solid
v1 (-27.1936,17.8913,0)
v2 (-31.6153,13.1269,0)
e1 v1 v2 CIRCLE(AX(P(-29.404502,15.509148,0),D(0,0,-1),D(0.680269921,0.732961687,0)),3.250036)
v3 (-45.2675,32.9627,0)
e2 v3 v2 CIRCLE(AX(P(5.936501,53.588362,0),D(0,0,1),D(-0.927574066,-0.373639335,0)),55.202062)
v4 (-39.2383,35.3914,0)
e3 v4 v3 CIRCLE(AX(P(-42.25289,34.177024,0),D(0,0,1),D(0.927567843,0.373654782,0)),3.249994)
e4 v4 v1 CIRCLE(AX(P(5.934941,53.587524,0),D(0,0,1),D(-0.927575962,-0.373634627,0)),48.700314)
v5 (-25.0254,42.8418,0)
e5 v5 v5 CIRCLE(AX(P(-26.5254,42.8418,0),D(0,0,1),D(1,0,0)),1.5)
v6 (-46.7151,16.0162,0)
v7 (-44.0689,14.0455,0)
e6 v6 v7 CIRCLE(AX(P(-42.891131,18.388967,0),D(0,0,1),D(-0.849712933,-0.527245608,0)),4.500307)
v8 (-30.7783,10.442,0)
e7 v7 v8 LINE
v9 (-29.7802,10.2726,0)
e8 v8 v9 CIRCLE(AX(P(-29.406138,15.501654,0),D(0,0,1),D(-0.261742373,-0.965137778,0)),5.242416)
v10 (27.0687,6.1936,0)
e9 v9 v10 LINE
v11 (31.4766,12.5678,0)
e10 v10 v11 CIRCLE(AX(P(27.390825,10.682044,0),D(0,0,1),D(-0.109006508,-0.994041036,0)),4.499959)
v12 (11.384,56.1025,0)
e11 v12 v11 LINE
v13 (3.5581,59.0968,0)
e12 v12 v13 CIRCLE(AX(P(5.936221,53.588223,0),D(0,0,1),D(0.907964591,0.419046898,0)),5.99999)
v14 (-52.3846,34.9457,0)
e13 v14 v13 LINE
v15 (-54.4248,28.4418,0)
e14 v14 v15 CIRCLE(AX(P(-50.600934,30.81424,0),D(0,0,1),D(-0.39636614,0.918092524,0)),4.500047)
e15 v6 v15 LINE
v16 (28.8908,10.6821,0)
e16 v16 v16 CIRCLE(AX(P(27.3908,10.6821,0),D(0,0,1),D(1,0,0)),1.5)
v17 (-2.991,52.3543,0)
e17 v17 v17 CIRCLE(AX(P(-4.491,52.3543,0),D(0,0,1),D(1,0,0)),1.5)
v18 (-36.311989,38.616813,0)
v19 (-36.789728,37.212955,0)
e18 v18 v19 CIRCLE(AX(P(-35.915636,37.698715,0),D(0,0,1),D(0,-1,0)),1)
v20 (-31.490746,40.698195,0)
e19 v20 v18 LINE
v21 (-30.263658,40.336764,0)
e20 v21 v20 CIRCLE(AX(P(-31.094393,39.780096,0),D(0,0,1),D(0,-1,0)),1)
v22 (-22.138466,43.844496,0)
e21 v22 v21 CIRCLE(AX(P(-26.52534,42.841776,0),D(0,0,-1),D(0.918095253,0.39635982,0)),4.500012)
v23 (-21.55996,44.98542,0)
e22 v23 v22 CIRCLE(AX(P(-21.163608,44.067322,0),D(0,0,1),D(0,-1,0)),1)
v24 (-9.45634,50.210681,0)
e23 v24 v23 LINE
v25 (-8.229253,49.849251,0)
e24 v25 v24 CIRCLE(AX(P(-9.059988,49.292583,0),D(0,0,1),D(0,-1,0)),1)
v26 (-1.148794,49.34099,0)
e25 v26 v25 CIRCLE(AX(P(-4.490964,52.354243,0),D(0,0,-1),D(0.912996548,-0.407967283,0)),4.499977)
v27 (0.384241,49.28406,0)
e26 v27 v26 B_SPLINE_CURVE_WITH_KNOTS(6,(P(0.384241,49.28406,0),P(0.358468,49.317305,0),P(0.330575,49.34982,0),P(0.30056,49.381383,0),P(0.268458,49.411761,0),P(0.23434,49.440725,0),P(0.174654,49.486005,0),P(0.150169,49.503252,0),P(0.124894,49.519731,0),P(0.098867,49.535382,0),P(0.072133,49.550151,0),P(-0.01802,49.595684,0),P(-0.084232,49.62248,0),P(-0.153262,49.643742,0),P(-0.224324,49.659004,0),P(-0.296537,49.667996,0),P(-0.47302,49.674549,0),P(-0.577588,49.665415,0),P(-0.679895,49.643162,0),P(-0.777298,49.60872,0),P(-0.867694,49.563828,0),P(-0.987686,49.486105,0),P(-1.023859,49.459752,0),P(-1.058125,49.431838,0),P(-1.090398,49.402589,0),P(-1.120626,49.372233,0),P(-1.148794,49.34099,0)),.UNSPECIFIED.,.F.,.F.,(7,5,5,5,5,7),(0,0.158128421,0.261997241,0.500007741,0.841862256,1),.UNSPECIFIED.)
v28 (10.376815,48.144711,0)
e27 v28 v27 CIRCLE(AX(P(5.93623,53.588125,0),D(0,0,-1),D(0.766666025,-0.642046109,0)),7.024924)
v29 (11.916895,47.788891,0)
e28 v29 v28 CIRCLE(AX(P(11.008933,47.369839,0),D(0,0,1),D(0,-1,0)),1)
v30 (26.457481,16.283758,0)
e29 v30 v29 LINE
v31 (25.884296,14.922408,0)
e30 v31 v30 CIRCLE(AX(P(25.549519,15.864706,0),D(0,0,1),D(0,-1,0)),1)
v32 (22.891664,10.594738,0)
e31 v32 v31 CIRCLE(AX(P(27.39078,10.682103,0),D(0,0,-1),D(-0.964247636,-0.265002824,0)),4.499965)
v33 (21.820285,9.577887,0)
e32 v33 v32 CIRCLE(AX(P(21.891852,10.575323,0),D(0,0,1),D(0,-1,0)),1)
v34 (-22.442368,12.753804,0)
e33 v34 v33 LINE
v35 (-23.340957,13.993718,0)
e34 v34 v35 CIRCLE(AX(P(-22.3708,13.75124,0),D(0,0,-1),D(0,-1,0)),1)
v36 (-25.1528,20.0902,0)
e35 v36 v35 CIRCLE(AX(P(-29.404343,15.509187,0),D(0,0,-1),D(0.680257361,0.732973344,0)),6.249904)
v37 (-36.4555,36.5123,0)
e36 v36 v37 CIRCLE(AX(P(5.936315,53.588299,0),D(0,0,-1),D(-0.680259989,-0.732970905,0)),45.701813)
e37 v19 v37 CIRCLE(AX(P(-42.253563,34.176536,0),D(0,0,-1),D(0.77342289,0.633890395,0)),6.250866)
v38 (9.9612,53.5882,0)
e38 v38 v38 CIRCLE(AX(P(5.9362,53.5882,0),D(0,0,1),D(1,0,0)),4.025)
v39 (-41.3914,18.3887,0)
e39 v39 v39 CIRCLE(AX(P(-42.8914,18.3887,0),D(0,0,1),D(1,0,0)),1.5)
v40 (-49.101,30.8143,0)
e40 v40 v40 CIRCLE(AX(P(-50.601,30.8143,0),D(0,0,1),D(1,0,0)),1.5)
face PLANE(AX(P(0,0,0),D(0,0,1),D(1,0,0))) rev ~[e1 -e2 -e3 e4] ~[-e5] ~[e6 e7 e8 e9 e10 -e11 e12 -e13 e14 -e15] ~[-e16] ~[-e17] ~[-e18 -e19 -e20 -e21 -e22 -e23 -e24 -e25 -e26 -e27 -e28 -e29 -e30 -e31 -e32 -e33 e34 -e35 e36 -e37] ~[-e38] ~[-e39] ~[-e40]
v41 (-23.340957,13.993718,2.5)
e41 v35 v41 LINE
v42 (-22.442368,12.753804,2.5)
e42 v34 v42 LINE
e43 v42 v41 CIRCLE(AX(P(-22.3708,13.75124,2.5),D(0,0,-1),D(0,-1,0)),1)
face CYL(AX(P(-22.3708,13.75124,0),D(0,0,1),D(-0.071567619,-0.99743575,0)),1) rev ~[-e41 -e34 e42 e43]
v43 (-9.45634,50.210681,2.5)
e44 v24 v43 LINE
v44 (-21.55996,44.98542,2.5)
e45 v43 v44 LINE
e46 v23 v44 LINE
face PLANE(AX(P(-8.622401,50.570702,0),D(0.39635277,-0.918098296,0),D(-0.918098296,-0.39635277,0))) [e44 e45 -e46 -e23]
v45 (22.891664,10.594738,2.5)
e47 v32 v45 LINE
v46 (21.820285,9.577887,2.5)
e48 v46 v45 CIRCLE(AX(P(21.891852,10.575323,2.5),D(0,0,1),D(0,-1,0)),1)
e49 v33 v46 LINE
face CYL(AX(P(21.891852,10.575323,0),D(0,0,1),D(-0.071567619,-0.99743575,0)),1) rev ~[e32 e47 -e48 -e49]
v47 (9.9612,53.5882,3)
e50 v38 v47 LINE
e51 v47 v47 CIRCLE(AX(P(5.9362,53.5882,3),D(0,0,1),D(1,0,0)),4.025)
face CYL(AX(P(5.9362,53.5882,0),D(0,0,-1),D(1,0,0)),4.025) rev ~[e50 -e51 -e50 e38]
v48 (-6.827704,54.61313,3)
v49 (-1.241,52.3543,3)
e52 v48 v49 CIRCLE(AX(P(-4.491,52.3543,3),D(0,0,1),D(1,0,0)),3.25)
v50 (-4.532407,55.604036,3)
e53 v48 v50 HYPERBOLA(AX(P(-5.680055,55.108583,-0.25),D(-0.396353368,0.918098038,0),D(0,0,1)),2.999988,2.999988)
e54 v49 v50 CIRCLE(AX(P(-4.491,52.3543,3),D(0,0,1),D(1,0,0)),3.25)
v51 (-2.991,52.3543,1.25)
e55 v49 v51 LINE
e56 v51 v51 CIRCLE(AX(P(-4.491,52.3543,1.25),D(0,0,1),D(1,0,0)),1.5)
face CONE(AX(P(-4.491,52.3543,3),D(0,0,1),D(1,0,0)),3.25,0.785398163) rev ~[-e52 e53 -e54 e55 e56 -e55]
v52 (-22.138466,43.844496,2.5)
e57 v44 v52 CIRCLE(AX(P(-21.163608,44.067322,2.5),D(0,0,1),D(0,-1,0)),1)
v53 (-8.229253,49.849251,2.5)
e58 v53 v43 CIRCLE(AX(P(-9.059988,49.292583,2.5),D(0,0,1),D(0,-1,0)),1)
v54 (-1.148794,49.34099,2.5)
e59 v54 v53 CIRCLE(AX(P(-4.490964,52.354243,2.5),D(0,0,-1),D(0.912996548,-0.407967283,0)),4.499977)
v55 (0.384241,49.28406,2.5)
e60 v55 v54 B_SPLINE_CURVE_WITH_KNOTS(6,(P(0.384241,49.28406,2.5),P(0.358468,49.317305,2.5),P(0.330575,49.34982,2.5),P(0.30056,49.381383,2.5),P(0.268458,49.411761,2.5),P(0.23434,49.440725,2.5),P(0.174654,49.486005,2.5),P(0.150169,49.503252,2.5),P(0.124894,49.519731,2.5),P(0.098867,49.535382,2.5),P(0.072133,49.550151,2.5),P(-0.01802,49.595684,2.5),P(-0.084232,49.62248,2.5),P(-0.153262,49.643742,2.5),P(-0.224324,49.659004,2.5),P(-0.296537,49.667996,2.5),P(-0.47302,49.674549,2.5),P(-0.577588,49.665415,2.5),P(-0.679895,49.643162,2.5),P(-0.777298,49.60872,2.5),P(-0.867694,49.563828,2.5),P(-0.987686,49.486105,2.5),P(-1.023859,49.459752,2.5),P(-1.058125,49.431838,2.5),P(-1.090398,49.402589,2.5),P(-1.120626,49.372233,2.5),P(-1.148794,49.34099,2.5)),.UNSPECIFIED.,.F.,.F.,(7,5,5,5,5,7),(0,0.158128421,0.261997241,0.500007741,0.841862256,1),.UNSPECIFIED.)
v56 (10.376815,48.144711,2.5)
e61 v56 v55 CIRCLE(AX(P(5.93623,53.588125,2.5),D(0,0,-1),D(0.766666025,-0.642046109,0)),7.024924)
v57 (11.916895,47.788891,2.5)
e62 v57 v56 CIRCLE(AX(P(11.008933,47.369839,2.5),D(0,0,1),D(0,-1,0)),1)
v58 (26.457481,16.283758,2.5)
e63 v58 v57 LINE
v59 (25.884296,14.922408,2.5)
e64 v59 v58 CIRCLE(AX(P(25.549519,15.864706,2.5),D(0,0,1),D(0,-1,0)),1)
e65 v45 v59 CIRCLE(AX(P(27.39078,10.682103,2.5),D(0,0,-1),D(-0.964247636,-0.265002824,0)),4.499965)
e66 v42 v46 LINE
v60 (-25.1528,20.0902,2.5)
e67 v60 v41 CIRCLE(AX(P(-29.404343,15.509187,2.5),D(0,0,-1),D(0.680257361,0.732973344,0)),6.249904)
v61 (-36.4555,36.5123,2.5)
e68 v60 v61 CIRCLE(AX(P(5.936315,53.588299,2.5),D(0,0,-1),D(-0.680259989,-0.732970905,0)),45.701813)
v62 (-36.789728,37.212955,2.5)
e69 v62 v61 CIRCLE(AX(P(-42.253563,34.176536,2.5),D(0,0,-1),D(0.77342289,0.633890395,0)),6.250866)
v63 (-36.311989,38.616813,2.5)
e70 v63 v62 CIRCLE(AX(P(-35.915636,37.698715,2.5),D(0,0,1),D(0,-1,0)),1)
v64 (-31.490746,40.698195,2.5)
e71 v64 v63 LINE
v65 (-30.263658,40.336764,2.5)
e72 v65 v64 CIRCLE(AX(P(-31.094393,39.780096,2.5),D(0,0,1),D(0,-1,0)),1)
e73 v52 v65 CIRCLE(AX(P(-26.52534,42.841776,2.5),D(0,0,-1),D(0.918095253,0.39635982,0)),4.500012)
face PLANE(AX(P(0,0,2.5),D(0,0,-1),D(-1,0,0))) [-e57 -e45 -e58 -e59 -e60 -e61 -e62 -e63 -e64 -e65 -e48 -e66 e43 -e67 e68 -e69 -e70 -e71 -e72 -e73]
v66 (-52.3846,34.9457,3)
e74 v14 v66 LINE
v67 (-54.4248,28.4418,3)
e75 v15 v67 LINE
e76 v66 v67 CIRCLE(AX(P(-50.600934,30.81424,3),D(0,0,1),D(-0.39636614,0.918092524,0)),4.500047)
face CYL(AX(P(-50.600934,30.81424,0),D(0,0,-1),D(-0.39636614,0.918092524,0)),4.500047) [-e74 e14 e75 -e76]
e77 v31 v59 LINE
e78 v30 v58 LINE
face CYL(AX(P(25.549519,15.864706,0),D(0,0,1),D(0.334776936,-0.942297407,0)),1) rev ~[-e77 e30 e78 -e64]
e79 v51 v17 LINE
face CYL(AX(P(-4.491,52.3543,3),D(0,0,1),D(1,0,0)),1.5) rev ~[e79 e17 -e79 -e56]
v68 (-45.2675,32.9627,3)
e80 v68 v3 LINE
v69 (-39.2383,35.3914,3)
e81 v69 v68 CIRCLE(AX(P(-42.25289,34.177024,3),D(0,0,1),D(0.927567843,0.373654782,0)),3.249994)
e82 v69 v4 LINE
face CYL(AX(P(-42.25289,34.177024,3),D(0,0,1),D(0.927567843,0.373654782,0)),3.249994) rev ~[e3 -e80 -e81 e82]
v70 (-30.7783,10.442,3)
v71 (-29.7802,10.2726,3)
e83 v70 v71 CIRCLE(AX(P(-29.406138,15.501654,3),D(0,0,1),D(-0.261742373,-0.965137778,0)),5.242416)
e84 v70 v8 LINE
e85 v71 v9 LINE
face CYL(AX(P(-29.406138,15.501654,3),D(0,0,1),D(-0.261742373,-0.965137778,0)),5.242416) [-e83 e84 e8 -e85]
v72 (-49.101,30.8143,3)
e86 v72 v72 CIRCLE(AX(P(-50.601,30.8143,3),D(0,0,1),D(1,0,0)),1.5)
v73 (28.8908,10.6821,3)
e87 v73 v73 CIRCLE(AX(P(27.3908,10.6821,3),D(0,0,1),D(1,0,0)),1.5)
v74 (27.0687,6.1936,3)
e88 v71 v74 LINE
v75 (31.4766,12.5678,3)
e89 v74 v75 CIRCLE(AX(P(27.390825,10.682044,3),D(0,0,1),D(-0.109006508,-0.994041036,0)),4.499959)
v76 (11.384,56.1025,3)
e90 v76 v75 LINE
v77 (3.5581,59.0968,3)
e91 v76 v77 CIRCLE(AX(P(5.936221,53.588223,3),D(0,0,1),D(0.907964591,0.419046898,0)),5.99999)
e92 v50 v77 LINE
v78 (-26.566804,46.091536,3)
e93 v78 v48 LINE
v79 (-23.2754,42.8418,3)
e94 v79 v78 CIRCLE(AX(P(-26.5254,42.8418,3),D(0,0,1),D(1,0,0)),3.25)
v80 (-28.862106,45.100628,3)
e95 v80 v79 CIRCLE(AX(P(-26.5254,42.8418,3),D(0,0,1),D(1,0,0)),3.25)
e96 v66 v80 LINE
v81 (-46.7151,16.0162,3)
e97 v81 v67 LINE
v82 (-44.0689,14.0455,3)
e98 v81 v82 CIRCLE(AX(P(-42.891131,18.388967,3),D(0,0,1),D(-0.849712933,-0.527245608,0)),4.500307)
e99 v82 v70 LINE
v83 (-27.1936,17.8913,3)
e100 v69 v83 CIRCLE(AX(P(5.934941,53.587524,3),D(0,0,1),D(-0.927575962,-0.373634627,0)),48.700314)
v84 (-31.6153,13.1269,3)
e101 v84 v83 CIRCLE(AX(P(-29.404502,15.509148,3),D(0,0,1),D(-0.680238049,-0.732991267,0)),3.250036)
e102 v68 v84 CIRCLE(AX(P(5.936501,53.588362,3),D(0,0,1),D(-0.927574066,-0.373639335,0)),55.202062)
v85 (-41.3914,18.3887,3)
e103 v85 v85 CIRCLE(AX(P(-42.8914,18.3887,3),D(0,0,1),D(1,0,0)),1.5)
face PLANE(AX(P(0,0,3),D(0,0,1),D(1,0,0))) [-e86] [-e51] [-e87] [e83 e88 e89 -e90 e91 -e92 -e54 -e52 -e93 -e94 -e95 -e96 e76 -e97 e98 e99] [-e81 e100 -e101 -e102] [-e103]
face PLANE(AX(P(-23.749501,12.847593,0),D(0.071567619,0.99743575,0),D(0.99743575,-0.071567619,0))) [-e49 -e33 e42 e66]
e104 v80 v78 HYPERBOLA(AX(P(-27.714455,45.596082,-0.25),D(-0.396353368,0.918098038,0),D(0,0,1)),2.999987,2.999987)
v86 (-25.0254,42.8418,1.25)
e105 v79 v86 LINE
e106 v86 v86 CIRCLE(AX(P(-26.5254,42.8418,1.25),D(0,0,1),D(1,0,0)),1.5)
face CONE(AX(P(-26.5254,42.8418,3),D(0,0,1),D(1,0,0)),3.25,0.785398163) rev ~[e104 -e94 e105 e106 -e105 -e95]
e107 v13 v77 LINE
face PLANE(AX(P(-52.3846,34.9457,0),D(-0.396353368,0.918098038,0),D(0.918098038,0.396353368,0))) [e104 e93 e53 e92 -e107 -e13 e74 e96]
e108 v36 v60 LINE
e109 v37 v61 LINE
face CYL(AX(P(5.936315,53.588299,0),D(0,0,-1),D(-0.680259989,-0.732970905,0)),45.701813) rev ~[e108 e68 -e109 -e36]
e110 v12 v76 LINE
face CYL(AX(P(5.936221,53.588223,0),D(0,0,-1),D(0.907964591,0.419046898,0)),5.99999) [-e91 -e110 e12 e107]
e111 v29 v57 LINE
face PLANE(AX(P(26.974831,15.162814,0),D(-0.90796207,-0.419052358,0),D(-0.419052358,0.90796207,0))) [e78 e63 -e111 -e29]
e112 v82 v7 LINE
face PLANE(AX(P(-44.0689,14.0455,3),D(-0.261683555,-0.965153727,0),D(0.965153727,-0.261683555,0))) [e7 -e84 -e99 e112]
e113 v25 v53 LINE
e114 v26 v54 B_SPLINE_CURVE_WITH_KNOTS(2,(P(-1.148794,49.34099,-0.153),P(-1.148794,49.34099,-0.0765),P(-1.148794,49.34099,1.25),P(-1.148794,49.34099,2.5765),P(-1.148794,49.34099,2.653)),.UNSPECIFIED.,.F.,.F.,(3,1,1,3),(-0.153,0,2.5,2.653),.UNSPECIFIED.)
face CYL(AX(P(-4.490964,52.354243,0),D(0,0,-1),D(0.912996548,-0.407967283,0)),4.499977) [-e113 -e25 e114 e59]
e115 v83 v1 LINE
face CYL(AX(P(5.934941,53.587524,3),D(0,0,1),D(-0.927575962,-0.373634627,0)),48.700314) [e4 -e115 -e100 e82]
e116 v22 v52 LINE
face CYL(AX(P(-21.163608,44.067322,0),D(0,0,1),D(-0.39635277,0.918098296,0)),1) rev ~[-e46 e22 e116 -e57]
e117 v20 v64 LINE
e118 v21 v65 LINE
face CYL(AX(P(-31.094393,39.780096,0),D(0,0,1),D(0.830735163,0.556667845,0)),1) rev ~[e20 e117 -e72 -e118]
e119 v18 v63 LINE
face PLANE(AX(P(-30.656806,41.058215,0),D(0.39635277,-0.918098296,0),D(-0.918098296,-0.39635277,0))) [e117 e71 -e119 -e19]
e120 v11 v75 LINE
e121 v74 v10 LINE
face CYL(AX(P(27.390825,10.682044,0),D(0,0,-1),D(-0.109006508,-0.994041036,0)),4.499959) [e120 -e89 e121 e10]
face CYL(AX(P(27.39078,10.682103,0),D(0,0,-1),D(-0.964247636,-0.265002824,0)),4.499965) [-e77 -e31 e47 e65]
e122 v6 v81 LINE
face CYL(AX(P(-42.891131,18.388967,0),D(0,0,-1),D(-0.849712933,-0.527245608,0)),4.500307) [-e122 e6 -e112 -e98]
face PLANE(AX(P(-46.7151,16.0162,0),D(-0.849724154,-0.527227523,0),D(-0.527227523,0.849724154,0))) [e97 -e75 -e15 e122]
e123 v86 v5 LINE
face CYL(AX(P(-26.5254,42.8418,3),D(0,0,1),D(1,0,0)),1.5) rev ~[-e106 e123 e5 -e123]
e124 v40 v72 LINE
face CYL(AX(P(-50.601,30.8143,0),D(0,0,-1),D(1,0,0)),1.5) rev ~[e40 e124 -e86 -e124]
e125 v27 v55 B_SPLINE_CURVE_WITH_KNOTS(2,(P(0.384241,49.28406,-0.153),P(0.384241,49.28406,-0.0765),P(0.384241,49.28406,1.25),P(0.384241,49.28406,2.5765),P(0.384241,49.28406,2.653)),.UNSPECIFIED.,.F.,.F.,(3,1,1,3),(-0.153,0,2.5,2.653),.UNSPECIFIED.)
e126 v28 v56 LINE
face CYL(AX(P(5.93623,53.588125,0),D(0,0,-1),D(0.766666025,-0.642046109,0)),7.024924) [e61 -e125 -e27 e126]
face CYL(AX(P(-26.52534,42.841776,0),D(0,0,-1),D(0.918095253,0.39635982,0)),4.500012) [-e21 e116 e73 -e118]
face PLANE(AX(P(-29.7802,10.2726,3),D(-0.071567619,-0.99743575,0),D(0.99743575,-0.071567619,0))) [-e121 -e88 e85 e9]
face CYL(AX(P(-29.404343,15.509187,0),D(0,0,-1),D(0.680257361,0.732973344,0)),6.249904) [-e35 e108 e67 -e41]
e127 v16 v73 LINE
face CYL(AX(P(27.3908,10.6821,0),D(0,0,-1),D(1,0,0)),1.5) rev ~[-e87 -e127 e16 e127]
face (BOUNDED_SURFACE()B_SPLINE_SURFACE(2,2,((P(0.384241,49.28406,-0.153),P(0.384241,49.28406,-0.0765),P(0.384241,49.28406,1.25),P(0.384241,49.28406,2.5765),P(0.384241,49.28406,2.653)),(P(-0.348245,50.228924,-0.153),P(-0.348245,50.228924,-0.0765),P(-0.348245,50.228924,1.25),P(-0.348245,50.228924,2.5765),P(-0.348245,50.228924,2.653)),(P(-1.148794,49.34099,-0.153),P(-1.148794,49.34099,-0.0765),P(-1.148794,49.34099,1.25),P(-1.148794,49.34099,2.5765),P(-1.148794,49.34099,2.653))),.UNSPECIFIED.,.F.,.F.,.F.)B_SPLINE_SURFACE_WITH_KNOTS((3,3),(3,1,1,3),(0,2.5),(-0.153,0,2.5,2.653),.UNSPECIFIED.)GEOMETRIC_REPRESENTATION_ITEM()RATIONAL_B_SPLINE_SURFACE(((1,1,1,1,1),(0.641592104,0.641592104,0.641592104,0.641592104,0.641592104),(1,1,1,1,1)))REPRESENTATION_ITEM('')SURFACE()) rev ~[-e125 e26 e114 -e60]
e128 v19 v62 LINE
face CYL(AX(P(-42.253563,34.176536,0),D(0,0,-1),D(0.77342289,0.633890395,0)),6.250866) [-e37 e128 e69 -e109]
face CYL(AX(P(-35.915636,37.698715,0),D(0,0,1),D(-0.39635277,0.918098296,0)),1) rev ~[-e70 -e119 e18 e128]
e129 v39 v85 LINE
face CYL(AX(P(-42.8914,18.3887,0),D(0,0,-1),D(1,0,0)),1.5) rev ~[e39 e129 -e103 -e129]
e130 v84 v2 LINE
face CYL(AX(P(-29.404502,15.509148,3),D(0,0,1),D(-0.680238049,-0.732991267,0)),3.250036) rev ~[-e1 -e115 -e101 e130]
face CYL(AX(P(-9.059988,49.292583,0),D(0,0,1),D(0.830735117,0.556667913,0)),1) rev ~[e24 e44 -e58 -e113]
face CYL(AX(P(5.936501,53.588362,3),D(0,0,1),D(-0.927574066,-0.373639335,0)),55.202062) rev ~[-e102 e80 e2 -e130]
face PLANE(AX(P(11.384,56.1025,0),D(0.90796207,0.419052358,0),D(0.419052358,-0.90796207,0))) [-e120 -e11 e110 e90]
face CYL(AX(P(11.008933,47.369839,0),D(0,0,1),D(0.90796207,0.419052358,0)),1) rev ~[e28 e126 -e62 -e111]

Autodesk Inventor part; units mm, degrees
ref_plane "YZ Plane" through (0, 0, 0) normal (1, 0, 0) x (0, 1, 0)
ref_plane "XZ Plane" through (0, 0, 0) normal (0, 1, 0) x (-1, 0, 0)
ref_plane "XY Plane" through (0, 0, 0) normal (0, 0, 1) x (1, 0, 0)
sketch "スケッチ1" plane through (0, 0, 0) normal (0, 0, 1) x (1, 0, 0)
  circle A0 centre (0, 0) radius 20.55 construction
  circle A1 centre (-21.6908, -16.4118) radius 19.1 construction
  circle A2 centre (25.3202, -9.9362) radius 19.1 construction
  circle A3 centre (-50.601, 30.8143) radius 1.5
  circle A4 centre (5.9362, 53.5882) radius 1.5
  circle A5 centre (27.3908, 10.6821) radius 1.5
  circle A6 centre (-42.8914, 18.3887) radius 1.5
  circle A7 centre (-21.6908, -16.4118) radius 4.025
  circle A8 centre (25.3202, -9.9362) radius 4.025
  circle A9 centre (0, 0) radius 4
  line L0 (-17.8785, -18.8026) -> (-30.4168, -38.7963) construction
  arc A10 (-17.8785, -18.8026) -> (-19.2493, -12.6317) centre (-21.6908, -16.4118) ccw construction
  line L1 (-19.2493, -12.6317) -> (-39.0737, 0.1727) construction
  line L2 (37.1409, -30.8522) -> (21.8866, -12.8448) construction
  arc A11 (22.3659, -6.5417) -> (21.8866, -12.8448) centre (25.3202, -9.9362) ccw construction
  line L3 (22.3659, -6.5417) -> (40.1678, 8.9519) construction
  line L4 (-21.6908, -16.4118) -> (-99.9742, 13.5882) construction
  line L5 (-105.5257, -16.4118) -> (-21.6908, -16.4118) construction
  line L6 (-21.6908, -16.4118) -> (-101.7113, -41.4118) construction
  line L7 (25.3202, -9.9362) -> (102.5386, -46.4118) construction
  line L8 (110.4743, -16.4118) -> (25.3202, -9.9362) construction
  line L9 (25.3202, -9.9362) -> (108.6869, 8.5882) construction
  line L10 (-18.0583, -13.7557) -> (-31.9879, 5.2949) construction
  line L11 (-17.339, -17.5569) -> (-24.5367, -44.9106) construction
  line L12 (21.5077, -7.5456) -> (34.045, 12.4488) construction
  line L13 (21.0739, -11.4259) -> (31.6059, -41.446) construction
  arc A12 (-24.6176, -40.3201) -> (-19.5065, -44.4166) centre (-20.132, -39.9603) ccw
  circle A13 centre (-20.132, -39.9603) radius 3 construction
  arc A14 (-38.9879, 7.9907) -> (-39.3359, 8.5262) centre (-35.3982, 10.7044) ccw construction
  circle A15 centre (-35.3982, 10.7044) radius 3 construction
  arc A16 (-31.9879, 5.2949) -> (-33.8465, 6.7744) centre (-35.6204, 2.6388) ccw construction
  circle A17 centre (-41.5152, -3.6073) radius 1.5
  line L14 (-33.8465, 6.7744) -> (-56.066, 16.3055) construction
  line L15 (-41.3386, 0.8892) -> (-72.6317, 2.1181) construction
  circle A18 centre (-42.8914, 18.3887) radius 3 construction
  circle A19 centre (-35.3982, 10.7044) radius 1.5
  circle A20 centre (36.7736, 17.5344) radius 1.5
  arc A21 (40.7942, 15.5132) -> (40.1934, 20.4593) centre (36.7736, 17.5344) ccw
  circle A22 centre (25.6508, -33.5339) radius 1.5
  arc A23 (26.2763, -37.9902) -> (30.1508, -33.5178) centre (25.6508, -33.5339) ccw
  circle A24 centre (36.7736, 17.5344) radius 3 construction
  circle A25 centre (25.6508, -33.5339) radius 3 construction
  arc A26 (36.6836, 14.4025) -> (34.045, 12.4488) centre (37.8575, 10.0583) ccw construction
  line L16 (36.6836, 14.4025) -> (64.1968, 21.8369) construction
  line L17 (43.2599, 10.0553) -> (82.9273, 8.8396) construction
  circle A27 centre (27.3908, 10.6821) radius 3 construction
  circle A28 centre (-21.6908, -16.4118) radius 7.025 construction
  circle A29 centre (25.3202, -9.9362) radius 7.025 construction
  arc A30 (40.8593, 15.6483) -> (30.1508, -33.5178) centre (146.4685, -33.1029) ccw
  arc A31 (-24.6176, -40.3201) -> (-39.1827, 8.2484) centre (-145.1158, -49.988) ccw
  arc A32 (-52.2824, 34.9884) -> (-54.1907, 28.1005) centre (-50.601, 30.8143) ccw
  arc A33 (9.356, 56.5132) -> (4.2549, 57.7623) centre (5.9362, 53.5882) ccw
  line L18 (-39.1827, 8.2484) -> (-54.1907, 28.1005)
  line L19 (-52.2824, 34.9884) -> (4.2549, 57.7623)
  line L20 (9.356, 56.5132) -> (40.1934, 20.4593)
  line L21 (-19.5065, -44.4166) -> (26.2763, -37.9902)
  circle A34 centre (-20.132, -39.9603) radius 1.5
  line L22 (-23.8868, -42.4405) -> (-17.339, -17.5569)
  arc A35 (-17.339, -17.5569) -> (-18.0583, -13.7557) centre (-21.6908, -16.4118) ccw
  line L23 (-18.0583, -13.7557) -> (-31.9879, 5.2949)
  arc A36 (-31.9879, 5.2949) -> (-33.8465, 6.7744) centre (-35.6204, 2.6388) ccw
  line L24 (-33.8465, 6.7744) -> (-40.0946, 9.4545)
  line L25 (40.7974, 15.5141) -> (36.6836, 14.4025)
  arc A37 (36.6836, 14.4025) -> (34.045, 12.4488) centre (37.8575, 10.0583) ccw
  line L26 (34.045, 12.4488) -> (21.5077, -7.5456)
  arc A38 (21.5077, -7.5456) -> (21.0739, -11.4259) centre (25.3202, -9.9362) ccw
  line L27 (21.0739, -11.4259) -> (29.592, -35.7057)
  dimension "d0" = 8.05
  dimension "d1" = 8.05
  dimension "d2" = 8
  dimension "d3" = 20.968
  dimension "d4" = 20.968
  dimension "d5" = 17.35
  dimension "d6" = 17.35
  dimension "d7" = 16.877
  dimension "d8" = 16.877
  dimension "d9" = 20.936
  dimension "d10" = 20.936
  dimension "d11" = 9
  dimension "d12" = 6
  dimension "d13" = 9
  dimension "d14" = 6
  dimension "d15" = 9
  dimension "d16" = 20.968
  dimension "d17" = 20.968
  dimension "d18" = 6
  dimension "d19" = 3
  dimension "d20" = 3
  dimension "d21" = 9
  dimension "d22" = 3
  dimension "d23" = 9
  dimension "d24" = 6
  dimension "d25" = 6
  dimension "d26" = 9
  dimension "d27" = 16.877
  dimension "d28" = 3
  dimension "d29" = 3
  dimension "d30" = 9
  dimension "d31" = 9
  dimension "d32" = 3
sketch "スケッチ2" plane through (0, 0, 0) normal (0, 0, 1) x (1, 0, 0)
  circle A0 centre (-50.601, 30.8143) radius 1.5 projected
  circle A1 centre (-42.8914, 18.3887) radius 1.5 projected
  circle A2 centre (5.9362, 53.5882) radius 1.5 projected
  circle A3 centre (27.3908, 10.6821) radius 1.5 projected
  arc A4 (-52.3846, 34.9457) -> (-54.4248, 28.4418) centre (-50.601, 30.8143) ccw
  arc A5 (-46.7151, 16.0162) -> (-43.3819, 13.9155) centre (-42.8914, 18.3887) ccw
  arc A6 (11.384, 56.1025) -> (3.5581, 59.0968) centre (5.9362, 53.5882) ccw
  arc A7 (26.9003, 6.2089) -> (31.4766, 12.5678) centre (27.3908, 10.6821) ccw
  line L0 (-46.7151, 16.0162) -> (-54.4248, 28.4418)
  line L1 (-52.3846, 34.9457) -> (3.5581, 59.0968)
  line L2 (11.384, 56.1025) -> (31.4766, 12.5678)
  line L3 (26.9003, 6.2089) -> (-43.3819, 13.9155)
  circle A8 centre (5.9362, 53.5882) radius 4.025
  point P0 (0, 0)
  dimension "d33" = 3
  dimension "d34" = 3
  dimension "d35" = 4.5
  dimension "d36" = 3
  dimension "d39" = 8.05
extrude "押し出し1" add sketch "スケッチ2" along normal blind 3 contours L1 A6 L2 A7 L3 A5 L0 A4
sketch "スケッチ3" plane through (0, 0, 3) normal (0, 0, 1) x (1, 0, 0)
  circle A0 centre (5.9362, 53.5882) radius 4.025 projected
  circle A1 centre (27.3908, 10.6821) radius 1.5 projected
  circle A2 centre (-42.8914, 18.3887) radius 1.5 projected
  circle A3 centre (-50.601, 30.8143) radius 1.5 projected
  line L0 (-54.4248, 28.4418) -> (-46.7151, 16.0162) projected
  arc A4 (-46.7151, 16.0162) -> (-43.3819, 13.9155) centre (-42.8914, 18.3887) ccw projected
  line L1 (-43.3819, 13.9155) -> (26.9003, 6.2089) projected
  arc A5 (26.9003, 6.2089) -> (31.4766, 12.5678) centre (27.3908, 10.6821) ccw projected
  line L2 (31.4766, 12.5678) -> (11.384, 56.1025) projected
  arc A6 (11.384, 56.1025) -> (3.5581, 59.0968) centre (5.9362, 53.5882) ccw projected
  line L3 (3.5581, 59.0968) -> (-52.3846, 34.9457) projected
  arc A7 (-52.3846, 34.9457) -> (-54.4248, 28.4418) centre (-50.601, 30.8143) ccw projected
  circle A8 centre (5.9362, 53.5882) radius 6
  circle A9 centre (-26.5254, 42.8418) radius 1.5
  circle A10 centre (-4.491, 52.3543) radius 1.5
  circle A11 centre (-4.491, 52.3543) radius 4.5 construction
  point P0 (0, 0)
  dimension "d40" = 12
  dimension "d41" = 3
  dimension "d42" = 3
  dimension "d43" = 3
  dimension "d44" = 3
  dimension "d45" = 24
  dimension "d46" = 9
extrude "押し出し2" cut sketch "スケッチ3" against normal blind 10 contours A9 | A10
chamfer "面取り1" distance 1.75 angle 45 2 edges at (-5.991, 52.3543, 3) (-28.0254, 42.8418, 3)
sketch "スケッチ4" plane through (0, 0, 3) normal (0, 0, 1) x (1, 0, 0)
  circle A0 centre (127.6431, 30.2622) radius 1.5
  circle A1 centre (5.9362, 53.5882) radius 1.5
  line L0 (5.9362, 53.5882) -> (127.6431, 30.2622) construction
  circle A2 centre (5.9362, 53.5882) radius 4.025
  circle A3 centre (127.6431, 30.2622) radius 4.025
  arc A4 (127.2517, 23.2481) -> (128.9655, 37.1616) centre (127.6431, 30.2622) ccw
  line L1 (12.8357, 52.2659) -> (13.4004, 55.2122)
  line L2 (15.4628, 54.817) -> (26.0698, 52.7841)
  line L3 (28.1322, 52.3888) -> (27.5675, 49.4424)
  line L4 (14.8981, 51.8706) -> (25.5051, 49.8377)
  line L5 (120.7437, 31.5845) -> (121.3084, 34.5309)
  line L6 (119.246, 34.9262) -> (108.639, 36.9591)
  line L7 (106.5765, 37.3543) -> (106.0119, 34.408)
  line L8 (108.0743, 34.0127) -> (118.6813, 31.9798)
  circle A5 centre (19.3546, 46.4346) radius 3
  circle A6 centre (112.5307, 28.5767) radius 3
  line L9 (7.2586, 60.4876) -> (128.9655, 37.1616)
  arc A7 (17.9263, 42.1672) -> (21.5465, 42.5045) centre (19.3546, 46.4346) ccw
  arc A8 (109.041, 25.7356) -> (112.28, 24.0837) centre (112.5307, 28.5767) ccw
  line L10 (3.7066, 46.9264) -> (17.9263, 42.1672)
  line L11 (112.28, 24.0837) -> (127.2517, 23.2481)
  circle A9 centre (19.3546, 46.4346) radius 1.5
  circle A10 centre (112.5307, 28.5767) radius 1.5
  line L12 (32.3442, 48.5269) -> (21.5465, 42.5045)
  line L13 (109.041, 25.7356) -> (101.2351, 35.3235)
  line L14 (32.3442, 48.5269) -> (101.2351, 35.3235)
  arc A11 (108.639, 36.9591) -> (106.5765, 37.3543) centre (107.6078, 37.1567) ccw
  arc A12 (106.0119, 34.408) -> (108.0743, 34.0127) centre (107.0431, 34.2103) ccw
  arc A13 (121.3084, 34.5309) -> (119.246, 34.9262) centre (120.2772, 34.7285) ccw
  arc A14 (118.6813, 31.9798) -> (120.7437, 31.5845) centre (119.7125, 31.7821) ccw
  arc A15 (28.1322, 52.3888) -> (26.0698, 52.7841) centre (27.101, 52.5864) ccw
  arc A16 (25.5051, 49.8377) -> (27.5675, 49.4424) centre (26.5363, 49.64) ccw
  arc A17 (15.4628, 54.817) -> (13.4004, 55.2122) centre (14.4316, 55.0146) ccw
  arc A18 (12.8357, 52.2659) -> (14.8981, 51.8706) centre (13.8669, 52.0682) ccw
  line L15 (5.9362, 53.5882) -> (-35.9404, 22.842) construction
  circle A19 centre (-35.9404, 22.842) radius 1.5
  arc A20 (-37.7159, 25.2602) -> (-34.165, 20.4238) centre (-35.9404, 22.842) ccw
  line L16 (-37.7159, 25.2602) -> (-0.9595, 52.247)
  line L17 (-34.165, 20.4238) -> (2.5914, 47.4106)
  arc A21 (7.2586, 60.4876) -> (-0.9595, 52.247) centre (5.9362, 53.5882) ccw
  arc A22 (2.5914, 47.4106) -> (3.7066, 46.9264) centre (5.9362, 53.5882) ccw
  circle A23 centre (0, 0) radius 10.1 construction
  circle A24 centre (25.3202, -9.9362) radius 17.1 construction
  circle A25 centre (110.4743, -16.4118) radius 28.1 construction
  circle A26 centre (62.4131, -12.7569) radius 20.1 construction
  circle A27 centre (-21.6908, -16.4118) radius 17.1 construction
  circle A28 centre (-105.5257, -16.4118) radius 28.1 construction
  line L18 (-170.915, -81.4118) -> (490.0044, -81.4118)
  line L19 (-105.5257, -16.4118) -> (-21.6908, -16.4118) construction
  line L20 (110.4743, -16.4118) -> (25.3202, -9.9362) construction
  line L21 (110.4743, -16.4118) -> (104.1501, -0.632)
  line L22 (104.1501, -0.632) -> (95.5937, 20.7173) construction
  line L23 (95.5937, 20.7173) -> (70.4743, -10.4118) construction
  line L24 (70.4743, -10.4118) -> (110.4743, -16.4118) construction
  line L25 (-137.6819, 53.5882) -> (165.8186, 53.5882)
  line L26 (25.3202, -9.9362) -> (108.6869, 8.5882) construction
  line L27 (25.3202, -9.9362) -> (102.5386, -46.4118) construction
  line L28 (25.3202, -9.9362) -> (5.9362, 53.5882) construction
  line L29 (5.9362, 53.5882) -> (127.6431, 30.2622)
  line L30 (127.6431, 30.2622) -> (110.4743, -16.4118) construction
  line L31 (102.5386, -46.4118) -> (118.0681, 0.8329) construction
  line L32 (118.0681, 0.8329) -> (5.9362, 53.5882) construction
  line L33 (108.6869, 8.5882) -> (129.8583, 53.5882) construction
  line L34 (129.8583, 53.5882) -> (5.9362, 53.5882) construction
  line L35 (119.2726, 31.0882) -> (366.4441, 68.5882) construction
  line L36 (119.0587, 6.9252) -> (362.0213, 65.8249) construction
  line L37 (110.3034, -22.7894) -> (351.0624, 44.5537) construction
  line L38 (127.6431, 30.2622) -> (4.1927, 19.4617) construction
  circle A29 centre (80.4743, 23.124) radius 3 construction
  circle A30 centre (80.4743, 23.124) radius 1.5
  arc A31 (79.801, 27.5733) -> (76.162, 24.4099) centre (80.4743, 23.124) ccw
  circle A32 centre (70.4743, -10.4118) radius 1.5
  arc A33 (66.162, -9.1259) -> (69.4242, -14.7876) centre (70.4743, -10.4118) ccw
  circle A34 centre (150.4743, 0.5882) radius 1.5
  arc A35 (152.5623, -3.3981) -> (154.0408, 3.3323) centre (150.4743, 0.5882) ccw
  circle A36 centre (127.6431, 30.2622) radius 1.5
  arc A37 (131.2816, 32.9102) -> (126.9698, 34.7115) centre (127.6431, 30.2622) ccw
  circle A38 centre (110.4743, -16.4118) radius 5
  arc A39 (108.6075, -24.1909) -> (114.1862, -23.4986) centre (110.4743, -16.4118) ccw
  line L39 (76.162, 24.4099) -> (66.162, -9.1259)
  line L40 (69.4242, -14.7876) -> (108.6075, -24.1909)
  line L41 (114.1862, -23.4986) -> (152.5623, -3.3981)
  line L42 (154.0408, 3.3323) -> (131.2097, 33.0062)
  line L43 (126.9698, 34.7115) -> (79.801, 27.5733)
  circle A40 centre (-145.5257, 0.5882) radius 1.5
  arc A41 (-149.0922, 3.3323) -> (-147.6136, -3.3981) centre (-145.5257, 0.5882) ccw
  circle A42 centre (-105.5257, -16.4118) radius 5
  arc A43 (-109.2375, -23.4986) -> (-103.6588, -24.1909) centre (-105.5257, -16.4118) ccw
  circle A44 centre (-65.5257, -10.4118) radius 1.5
  arc A45 (-64.4756, -14.7876) -> (-61.2133, -9.1259) centre (-65.5257, -10.4118) ccw
  circle A46 centre (0, 0) radius 20.05 construction
  circle A47 centre (110.4743, -16.4118) radius 30.1 construction
  circle A48 centre (62.4131, -12.7569) radius 22.1 construction
  circle A49 centre (25.3202, -9.9362) radius 19.1 construction
  circle A50 centre (0, 0) radius 12.1 construction
  circle A51 centre (-21.6908, -16.4118) radius 19.1 construction
  circle A52 centre (-105.5257, -16.4118) radius 30.1 construction
  circle A53 centre (0, 0) radius 20.55 construction
  circle A54 centre (95.5937, 20.7173) radius 4.025 construction
  circle A55 centre (95.5937, 20.7173) radius 6.025 construction
  circle A56 centre (-75.5257, 23.124) radius 1.5
  arc A57 (-71.2133, 24.4099) -> (-74.8523, 27.5733) centre (-75.5257, 23.124) ccw
  circle A58 centre (-122.6945, 30.2622) radius 1.5
  arc A59 (-122.0212, 34.7115) -> (-126.261, 33.0062) centre (-122.6945, 30.2622) ccw
  line L44 (-126.261, 33.0062) -> (-149.0922, 3.3323)
  line L45 (-147.6136, -3.3981) -> (-109.2375, -23.4986)
  line L46 (-103.6588, -24.1909) -> (-64.4756, -14.7876)
  line L47 (-61.2133, -9.1259) -> (-71.2133, 24.4099)
  line L48 (-74.8523, 27.5733) -> (-122.0212, 34.7115)
  circle A60 centre (14, -17.4118) radius 2.2921 construction
  circle A61 centre (-14, -17.4118) radius 2.2921 construction
  circle A62 centre (-14, -17.4118) radius 14 construction
  circle A63 centre (14, -17.4118) radius 14 construction
  line L49 (-170.6512, -31.4118) -> (202.8656, -31.4118)
  line L50 (5.9362, 53.5882) -> (-42.2529, 34.177) construction
  line L51 (5.9362, 53.5882) -> (-29.4045, 15.5091) construction
  circle A64 centre (5.9362, 53.5882) radius 1.5
  arc A65 (9.9611, 55.6008) -> (4.2549, 57.7623) centre (5.9362, 53.5882) ccw
  line L52 (-21.6908, -16.4118) -> (-99.9742, 13.5882) construction
  line L53 (-21.6908, -16.4118) -> (-101.7113, -41.4118) construction
  line L54 (9.9611, 55.6008) -> (31.4156, 12.6947)
  circle A66 centre (-50.601, 30.8143) radius 1.5
  arc A67 (-52.2824, 34.9884) -> (-54.4248, 28.4418) centre (-50.601, 30.8143) ccw
  line L55 (4.2549, 57.7623) -> (-52.2824, 34.9884)
  line L56 (-54.4248, 28.4418) -> (-46.7151, 16.0162)
  circle A68 centre (27.3908, 10.6821) radius 3 construction
  circle A69 centre (-84.8661, 5.2713) radius 4.5 construction
  circle A70 centre (-132.0174, -1.9813) radius 4.5 construction
  line L57 (-132.7015, 2.4664) -> (-85.5502, 9.719) construction
  arc A71 (26.9003, 6.2089) -> (31.4156, 12.6947) centre (27.3908, 10.6821) ccw
  arc A72 (-46.7151, 16.0162) -> (-43.3819, 13.9155) centre (-42.8914, 18.3887) ccw
  line L58 (-43.3819, 13.9155) -> (26.9003, 6.2089)
  circle A73 centre (-42.2529, 34.177) radius 3 construction
  circle A74 centre (25.3202, -9.9362) radius 4.025 construction
  circle A75 centre (-21.6908, -16.4118) radius 4.025 construction
  circle A76 centre (-42.8914, 18.3887) radius 1.5
  circle A77 centre (27.3908, 10.6821) radius 1.5
  circle A78 centre (-57.813, 39.7705) radius 4.5 construction
  circle A79 centre (-99.304, 63.3152) radius 4.5 construction
  line L59 (5.9362, 53.5882) -> (-35.9404, 22.842) construction
  circle A80 centre (-58.0056, -24.4791) radius 20.1 construction
  circle A81 centre (-58.0056, -24.4791) radius 22.1 construction
  line L60 (-53.3261, 39.4281) -> (-56.2797, 0.7243) construction
  circle A82 centre (-42.2529, 34.177) radius 4.5
  dimension "d169" = 9
  dimension "d170" = 9
  dimension "d185" = 9
  dimension "d52" = 8.05
  dimension "d53" = 8.05
  dimension "d54" = 3
  dimension "d55" = 3
  dimension "d56" = 15
  dimension "d57" = 3
  dimension "d58" = 15
  dimension "d59" = 6
  dimension "d60" = 6
  dimension "d61" = 9
  dimension "d62" = 9
  dimension "d63" = 3
  dimension "d64" = 3
  dimension "d65" = 7.5
  dimension "d66" = 7.5
  dimension "d67" = 40
  dimension "d68" = 40
  dimension "d69" = 2.1
  dimension "d70" = 2.1
  dimension "d71" = 2.1
  dimension "d72" = 2.1
  dimension "d73" = 2.1
  dimension "d74" = 2.1
  dimension "d75" = 2.1
  dimension "d76" = 2.1
  dimension "d77" = 3
  dimension "d78" = 6
  dimension "d79" = 3
  dimension "d80" = 3
  dimension "d81" = 20.2
  dimension "d82" = 34.2
  dimension "d83" = 56.2
  dimension "d84" = 40.2
  dimension "d85" = 216
  dimension "d86" = 65
  dimension "d87" = 65
  dimension "d88" = 34.2
  dimension "d89" = 56.2
  dimension "d90" = 17
  dimension "d91" = 23
  dimension "d92" = 40
  dimension "d93" = 40
  dimension "d94" = 6
  dimension "d95" = 135
  dimension "d96" = 25
  dimension "d97" = 30
  dimension "d98" = 5
  dimension "d99" = 2
  dimension "d100" = 250
  dimension "d101" = 150
  dimension "d102" = 250
  dimension "d103" = 250
  dimension "d104" = 123.823
  dimension "d105" = 123.823
  dimension "d106" = 123.823
  dimension "d107" = 6
  dimension "d108" = 3
  dimension "d109" = 9
  dimension "d110" = 3
  dimension "d111" = 9
  dimension "d112" = 3
  dimension "d113" = 9
  dimension "d114" = 40
  dimension "d115" = 17
sketch "スケッチ5" plane through (0, 0, 3) normal (0, 0, 1) x (1, 0, 0)
  arc A0 (-42.2529, 34.177) -> (-29.4045, 15.5091) centre (5.9362, 53.5882) ccw construction
  arc A1 (-45.2675, 32.9627) -> (-31.6153, 13.1269) centre (5.9362, 53.5882) ccw
  arc A2 (-39.2383, 35.3914) -> (-27.1936, 17.8913) centre (5.9362, 53.5882) ccw
  arc A3 (-39.2383, 35.3914) -> (-45.2675, 32.9627) centre (-42.2529, 34.177) ccw
  arc A4 (-31.6153, 13.1269) -> (-27.1936, 17.8913) centre (-29.4045, 15.5091) ccw
  arc A5 (-37.3831, 36.1386) -> (-25.8331, 19.3572) centre (5.9362, 53.5882) ccw
  arc A6 (-37.3831, 36.1386) -> (-47.1226, 32.2154) centre (-42.2529, 34.177) ccw
  arc A7 (-47.1226, 32.2154) -> (-32.9758, 11.661) centre (5.9362, 53.5882) ccw
  arc A8 (-28.862, 45.1007) -> (-26.5668, 46.0915) centre (-26.5254, 42.8418) ccw projected
  line L0 (-28.862, 45.1007) -> (-52.3846, 34.9457) projected
  arc A9 (-52.3846, 34.9457) -> (-54.4248, 28.4418) centre (-50.601, 30.8143) ccw projected
  line L1 (-54.4248, 28.4418) -> (-46.7151, 16.0162) projected
  arc A10 (-46.7151, 16.0162) -> (-43.3819, 13.9155) centre (-42.8914, 18.3887) ccw projected
  line L2 (-43.3819, 13.9155) -> (26.9003, 6.2089) projected
  arc A11 (26.9003, 6.2089) -> (31.4766, 12.5678) centre (27.3908, 10.6821) ccw projected
  line L3 (31.4766, 12.5678) -> (11.384, 56.1025) projected
  arc A12 (11.384, 56.1025) -> (3.5581, 59.0968) centre (5.9362, 53.5882) ccw projected
  line L4 (3.5581, 59.0968) -> (-4.5324, 55.604) projected
  arc A13 (-6.8277, 54.6131) -> (-4.5324, 55.604) centre (-4.491, 52.3543) ccw projected
  line L5 (-6.8277, 54.6131) -> (-26.5668, 46.0915) projected
  circle A14 centre (5.9362, 53.5882) radius 4.025 projected
  circle A15 centre (27.3908, 10.6821) radius 1.5 projected
  circle A16 centre (-42.8914, 18.3887) radius 1.5 projected
  circle A17 centre (-50.601, 30.8143) radius 1.5 projected
  arc A18 (-46.7151, 16.0162) -> (-43.3819, 13.9155) centre (-42.8914, 18.3887) ccw projected
  line L6 (-29.7802, 10.2726) -> (27.0687, 6.1936)
  arc A19 (26.9003, 6.2089) -> (31.4766, 12.5678) centre (27.3908, 10.6821) ccw projected
  line L7 (-44.0689, 14.0455) -> (-30.7783, 10.442)
  arc A20 (-30.7783, 10.442) -> (-29.7802, 10.2726) centre (-29.4045, 15.5091) ccw
  arc A21 (-25.537, 11.9588) -> (-25.8331, 19.3572) centre (-29.4045, 15.5091) ccw
  point P0 (0, 0)
  point P1 (-35.9404, 22.842)
  dimension "d199" = 6.5
  dimension "d200" = 2
  dimension "d201" = 2
extrude "押し出し3" add sketch "スケッチ5" against normal blind 3 contours L2 A4 | A4 L2 A11 L6 A20 L7 A10
extrude "押し出し4" cut sketch "スケッチ5" against normal blind 3 contours A3 A2 A4 L2 A1 | L2 A4
sketch "スケッチ6" plane through (0, 0, 0) normal (0, 0, -1) x (-1, 0, 0)
  arc A0 (27.1936, 17.8913) -> (31.6153, 13.1269) centre (29.4045, 15.5091) ccw projected
  arc A1 (27.1936, 17.8913) -> (39.2383, 35.3914) centre (-5.9362, 53.5882) ccw projected
  arc A2 (45.2675, 32.9627) -> (39.2383, 35.3914) centre (42.2529, 34.177) ccw projected
  arc A3 (31.6153, 13.1269) -> (45.2675, 32.9627) centre (-5.9362, 53.5882) ccw projected
  circle A4 centre (26.5254, 42.8418) radius 1.5 projected
  circle A5 centre (4.491, 52.3543) radius 1.5 projected
  circle A6 centre (-5.9362, 53.5882) radius 4.025 projected
  circle A7 centre (-27.3908, 10.6821) radius 1.5 projected
  circle A8 centre (42.8914, 18.3887) radius 1.5 projected
  circle A9 centre (50.601, 30.8143) radius 1.5 projected
  line L0 (46.7151, 16.0162) -> (54.4248, 28.4418) projected
  arc A10 (54.4248, 28.4418) -> (52.3846, 34.9457) centre (50.601, 30.8143) ccw projected
  line L1 (52.3846, 34.9457) -> (-3.5581, 59.0968) projected
  arc A11 (-3.5581, 59.0968) -> (-11.384, 56.1025) centre (-5.9362, 53.5882) ccw projected
  line L2 (-11.384, 56.1025) -> (-31.4766, 12.5678) projected
  arc A12 (-31.4766, 12.5678) -> (-27.0687, 6.1936) centre (-27.3908, 10.6821) ccw projected
  line L3 (-27.0687, 6.1936) -> (29.7802, 10.2726) projected
  arc A13 (29.7802, 10.2726) -> (30.7783, 10.442) centre (29.4045, 15.5091) ccw projected
  line L4 (30.7783, 10.442) -> (44.0689, 14.0455) projected
  arc A14 (44.0689, 14.0455) -> (46.7151, 16.0162) centre (42.8914, 18.3887) ccw projected
  line L5 (-4.7472, 56.3425) -> (51.1956, 32.1914)
  arc A15 (51.8756, 30.0234) -> (51.1956, 32.1914) centre (50.601, 30.8143) ccw
  line L6 (51.8756, 30.0234) -> (44.166, 17.5978)
  arc A16 (43.2839, 16.9409) -> (44.166, 17.5978) centre (42.8914, 18.3887) ccw
  line L7 (43.2839, 16.9409) -> (29.9932, 13.3375)
  arc A17 (29.5655, 13.2649) -> (29.9932, 13.3375) centre (29.4045, 15.5091) ccw
  line L8 (29.5655, 13.2649) -> (-27.2834, 9.1859)
  arc A18 (-28.7527, 11.3107) -> (-27.2834, 9.1859) centre (-27.3908, 10.6821) ccw
  line L9 (-28.7527, 11.3107) -> (-8.6601, 54.8454)
  arc A19 (-4.7472, 56.3425) -> (-8.6601, 54.8454) centre (-5.9362, 53.5882) ccw
  arc A20 (-11.322, 49.0778) -> (0.3825, 50.5184) centre (-5.9362, 53.5882) ccw
  arc A21 (25.1528, 20.0902) -> (36.4555, 36.5123) centre (-5.9362, 53.5882) ccw
  arc A22 (25.1528, 20.0902) -> (23.7495, 12.8476) centre (29.4045, 15.5091) ccw
  arc A23 (33.6561, 10.928) -> (34.0975, 11.3419) centre (-5.9362, 53.5882) ccw
  arc A24 (22.3939, 44.6254) -> (30.6568, 41.0582) centre (26.5254, 42.8418) ccw
  arc A25 (0.3825, 50.5184) -> (8.6224, 50.5707) centre (4.491, 52.3543) ccw
  arc A26 (-23.0517, 9.4896) -> (-26.9748, 15.1628) centre (-27.3908, 10.6821) ccw
  arc A27 (37.419, 38.1389) -> (36.4555, 36.5123) centre (42.2529, 34.177) ccw
  point P0 (0, 0)
  dimension "d206" = 3
  dimension "d207" = 3
  dimension "d208" = 3
  dimension "d209" = 3
  dimension "d210" = 3
  dimension "d212" = 3
  dimension "d213" = 3
  dimension "d214" = 3
extrude "押し出し5" cut sketch "スケッチ6" against normal blind 2.5 contours L8 A26 L9 A20 A25 L5 A24 A27 A21 A22
fillet "フィレット1" radius 1 9 edges at (-23.7495, 12.8476, 1.25) (23.0517, 9.4896, 1.25) (26.9748, 15.1628, 1.25) (11.322, 49.0778, 1.25) (-0.3825, 50.5184, 1.25) (-8.6224, 50.5707, 1.25) (-22.3939, 44.6254, 1.25) (-30.6568, 41.0582, 1.25) (-37.419, 38.1389, 1.25)
equation "\"d4\" = d3"
equation "\"d6\" = d5"
equation "\"d8\" = d7"
equation "\"d10\" = d9"
equation "\"d16\" = d3"
equation "\"d17\" = d3"
equation "\"d27\" = d7"
equation "\"d68\" = d67"
equation "\"d88\" = d82"
equation "\"d89\" = d83"
equation "\"d105\" = d104"
equation "\"d106\" = d104"
properties part number "中間外フレーム2" material "アルミニウム 2014-T4"
